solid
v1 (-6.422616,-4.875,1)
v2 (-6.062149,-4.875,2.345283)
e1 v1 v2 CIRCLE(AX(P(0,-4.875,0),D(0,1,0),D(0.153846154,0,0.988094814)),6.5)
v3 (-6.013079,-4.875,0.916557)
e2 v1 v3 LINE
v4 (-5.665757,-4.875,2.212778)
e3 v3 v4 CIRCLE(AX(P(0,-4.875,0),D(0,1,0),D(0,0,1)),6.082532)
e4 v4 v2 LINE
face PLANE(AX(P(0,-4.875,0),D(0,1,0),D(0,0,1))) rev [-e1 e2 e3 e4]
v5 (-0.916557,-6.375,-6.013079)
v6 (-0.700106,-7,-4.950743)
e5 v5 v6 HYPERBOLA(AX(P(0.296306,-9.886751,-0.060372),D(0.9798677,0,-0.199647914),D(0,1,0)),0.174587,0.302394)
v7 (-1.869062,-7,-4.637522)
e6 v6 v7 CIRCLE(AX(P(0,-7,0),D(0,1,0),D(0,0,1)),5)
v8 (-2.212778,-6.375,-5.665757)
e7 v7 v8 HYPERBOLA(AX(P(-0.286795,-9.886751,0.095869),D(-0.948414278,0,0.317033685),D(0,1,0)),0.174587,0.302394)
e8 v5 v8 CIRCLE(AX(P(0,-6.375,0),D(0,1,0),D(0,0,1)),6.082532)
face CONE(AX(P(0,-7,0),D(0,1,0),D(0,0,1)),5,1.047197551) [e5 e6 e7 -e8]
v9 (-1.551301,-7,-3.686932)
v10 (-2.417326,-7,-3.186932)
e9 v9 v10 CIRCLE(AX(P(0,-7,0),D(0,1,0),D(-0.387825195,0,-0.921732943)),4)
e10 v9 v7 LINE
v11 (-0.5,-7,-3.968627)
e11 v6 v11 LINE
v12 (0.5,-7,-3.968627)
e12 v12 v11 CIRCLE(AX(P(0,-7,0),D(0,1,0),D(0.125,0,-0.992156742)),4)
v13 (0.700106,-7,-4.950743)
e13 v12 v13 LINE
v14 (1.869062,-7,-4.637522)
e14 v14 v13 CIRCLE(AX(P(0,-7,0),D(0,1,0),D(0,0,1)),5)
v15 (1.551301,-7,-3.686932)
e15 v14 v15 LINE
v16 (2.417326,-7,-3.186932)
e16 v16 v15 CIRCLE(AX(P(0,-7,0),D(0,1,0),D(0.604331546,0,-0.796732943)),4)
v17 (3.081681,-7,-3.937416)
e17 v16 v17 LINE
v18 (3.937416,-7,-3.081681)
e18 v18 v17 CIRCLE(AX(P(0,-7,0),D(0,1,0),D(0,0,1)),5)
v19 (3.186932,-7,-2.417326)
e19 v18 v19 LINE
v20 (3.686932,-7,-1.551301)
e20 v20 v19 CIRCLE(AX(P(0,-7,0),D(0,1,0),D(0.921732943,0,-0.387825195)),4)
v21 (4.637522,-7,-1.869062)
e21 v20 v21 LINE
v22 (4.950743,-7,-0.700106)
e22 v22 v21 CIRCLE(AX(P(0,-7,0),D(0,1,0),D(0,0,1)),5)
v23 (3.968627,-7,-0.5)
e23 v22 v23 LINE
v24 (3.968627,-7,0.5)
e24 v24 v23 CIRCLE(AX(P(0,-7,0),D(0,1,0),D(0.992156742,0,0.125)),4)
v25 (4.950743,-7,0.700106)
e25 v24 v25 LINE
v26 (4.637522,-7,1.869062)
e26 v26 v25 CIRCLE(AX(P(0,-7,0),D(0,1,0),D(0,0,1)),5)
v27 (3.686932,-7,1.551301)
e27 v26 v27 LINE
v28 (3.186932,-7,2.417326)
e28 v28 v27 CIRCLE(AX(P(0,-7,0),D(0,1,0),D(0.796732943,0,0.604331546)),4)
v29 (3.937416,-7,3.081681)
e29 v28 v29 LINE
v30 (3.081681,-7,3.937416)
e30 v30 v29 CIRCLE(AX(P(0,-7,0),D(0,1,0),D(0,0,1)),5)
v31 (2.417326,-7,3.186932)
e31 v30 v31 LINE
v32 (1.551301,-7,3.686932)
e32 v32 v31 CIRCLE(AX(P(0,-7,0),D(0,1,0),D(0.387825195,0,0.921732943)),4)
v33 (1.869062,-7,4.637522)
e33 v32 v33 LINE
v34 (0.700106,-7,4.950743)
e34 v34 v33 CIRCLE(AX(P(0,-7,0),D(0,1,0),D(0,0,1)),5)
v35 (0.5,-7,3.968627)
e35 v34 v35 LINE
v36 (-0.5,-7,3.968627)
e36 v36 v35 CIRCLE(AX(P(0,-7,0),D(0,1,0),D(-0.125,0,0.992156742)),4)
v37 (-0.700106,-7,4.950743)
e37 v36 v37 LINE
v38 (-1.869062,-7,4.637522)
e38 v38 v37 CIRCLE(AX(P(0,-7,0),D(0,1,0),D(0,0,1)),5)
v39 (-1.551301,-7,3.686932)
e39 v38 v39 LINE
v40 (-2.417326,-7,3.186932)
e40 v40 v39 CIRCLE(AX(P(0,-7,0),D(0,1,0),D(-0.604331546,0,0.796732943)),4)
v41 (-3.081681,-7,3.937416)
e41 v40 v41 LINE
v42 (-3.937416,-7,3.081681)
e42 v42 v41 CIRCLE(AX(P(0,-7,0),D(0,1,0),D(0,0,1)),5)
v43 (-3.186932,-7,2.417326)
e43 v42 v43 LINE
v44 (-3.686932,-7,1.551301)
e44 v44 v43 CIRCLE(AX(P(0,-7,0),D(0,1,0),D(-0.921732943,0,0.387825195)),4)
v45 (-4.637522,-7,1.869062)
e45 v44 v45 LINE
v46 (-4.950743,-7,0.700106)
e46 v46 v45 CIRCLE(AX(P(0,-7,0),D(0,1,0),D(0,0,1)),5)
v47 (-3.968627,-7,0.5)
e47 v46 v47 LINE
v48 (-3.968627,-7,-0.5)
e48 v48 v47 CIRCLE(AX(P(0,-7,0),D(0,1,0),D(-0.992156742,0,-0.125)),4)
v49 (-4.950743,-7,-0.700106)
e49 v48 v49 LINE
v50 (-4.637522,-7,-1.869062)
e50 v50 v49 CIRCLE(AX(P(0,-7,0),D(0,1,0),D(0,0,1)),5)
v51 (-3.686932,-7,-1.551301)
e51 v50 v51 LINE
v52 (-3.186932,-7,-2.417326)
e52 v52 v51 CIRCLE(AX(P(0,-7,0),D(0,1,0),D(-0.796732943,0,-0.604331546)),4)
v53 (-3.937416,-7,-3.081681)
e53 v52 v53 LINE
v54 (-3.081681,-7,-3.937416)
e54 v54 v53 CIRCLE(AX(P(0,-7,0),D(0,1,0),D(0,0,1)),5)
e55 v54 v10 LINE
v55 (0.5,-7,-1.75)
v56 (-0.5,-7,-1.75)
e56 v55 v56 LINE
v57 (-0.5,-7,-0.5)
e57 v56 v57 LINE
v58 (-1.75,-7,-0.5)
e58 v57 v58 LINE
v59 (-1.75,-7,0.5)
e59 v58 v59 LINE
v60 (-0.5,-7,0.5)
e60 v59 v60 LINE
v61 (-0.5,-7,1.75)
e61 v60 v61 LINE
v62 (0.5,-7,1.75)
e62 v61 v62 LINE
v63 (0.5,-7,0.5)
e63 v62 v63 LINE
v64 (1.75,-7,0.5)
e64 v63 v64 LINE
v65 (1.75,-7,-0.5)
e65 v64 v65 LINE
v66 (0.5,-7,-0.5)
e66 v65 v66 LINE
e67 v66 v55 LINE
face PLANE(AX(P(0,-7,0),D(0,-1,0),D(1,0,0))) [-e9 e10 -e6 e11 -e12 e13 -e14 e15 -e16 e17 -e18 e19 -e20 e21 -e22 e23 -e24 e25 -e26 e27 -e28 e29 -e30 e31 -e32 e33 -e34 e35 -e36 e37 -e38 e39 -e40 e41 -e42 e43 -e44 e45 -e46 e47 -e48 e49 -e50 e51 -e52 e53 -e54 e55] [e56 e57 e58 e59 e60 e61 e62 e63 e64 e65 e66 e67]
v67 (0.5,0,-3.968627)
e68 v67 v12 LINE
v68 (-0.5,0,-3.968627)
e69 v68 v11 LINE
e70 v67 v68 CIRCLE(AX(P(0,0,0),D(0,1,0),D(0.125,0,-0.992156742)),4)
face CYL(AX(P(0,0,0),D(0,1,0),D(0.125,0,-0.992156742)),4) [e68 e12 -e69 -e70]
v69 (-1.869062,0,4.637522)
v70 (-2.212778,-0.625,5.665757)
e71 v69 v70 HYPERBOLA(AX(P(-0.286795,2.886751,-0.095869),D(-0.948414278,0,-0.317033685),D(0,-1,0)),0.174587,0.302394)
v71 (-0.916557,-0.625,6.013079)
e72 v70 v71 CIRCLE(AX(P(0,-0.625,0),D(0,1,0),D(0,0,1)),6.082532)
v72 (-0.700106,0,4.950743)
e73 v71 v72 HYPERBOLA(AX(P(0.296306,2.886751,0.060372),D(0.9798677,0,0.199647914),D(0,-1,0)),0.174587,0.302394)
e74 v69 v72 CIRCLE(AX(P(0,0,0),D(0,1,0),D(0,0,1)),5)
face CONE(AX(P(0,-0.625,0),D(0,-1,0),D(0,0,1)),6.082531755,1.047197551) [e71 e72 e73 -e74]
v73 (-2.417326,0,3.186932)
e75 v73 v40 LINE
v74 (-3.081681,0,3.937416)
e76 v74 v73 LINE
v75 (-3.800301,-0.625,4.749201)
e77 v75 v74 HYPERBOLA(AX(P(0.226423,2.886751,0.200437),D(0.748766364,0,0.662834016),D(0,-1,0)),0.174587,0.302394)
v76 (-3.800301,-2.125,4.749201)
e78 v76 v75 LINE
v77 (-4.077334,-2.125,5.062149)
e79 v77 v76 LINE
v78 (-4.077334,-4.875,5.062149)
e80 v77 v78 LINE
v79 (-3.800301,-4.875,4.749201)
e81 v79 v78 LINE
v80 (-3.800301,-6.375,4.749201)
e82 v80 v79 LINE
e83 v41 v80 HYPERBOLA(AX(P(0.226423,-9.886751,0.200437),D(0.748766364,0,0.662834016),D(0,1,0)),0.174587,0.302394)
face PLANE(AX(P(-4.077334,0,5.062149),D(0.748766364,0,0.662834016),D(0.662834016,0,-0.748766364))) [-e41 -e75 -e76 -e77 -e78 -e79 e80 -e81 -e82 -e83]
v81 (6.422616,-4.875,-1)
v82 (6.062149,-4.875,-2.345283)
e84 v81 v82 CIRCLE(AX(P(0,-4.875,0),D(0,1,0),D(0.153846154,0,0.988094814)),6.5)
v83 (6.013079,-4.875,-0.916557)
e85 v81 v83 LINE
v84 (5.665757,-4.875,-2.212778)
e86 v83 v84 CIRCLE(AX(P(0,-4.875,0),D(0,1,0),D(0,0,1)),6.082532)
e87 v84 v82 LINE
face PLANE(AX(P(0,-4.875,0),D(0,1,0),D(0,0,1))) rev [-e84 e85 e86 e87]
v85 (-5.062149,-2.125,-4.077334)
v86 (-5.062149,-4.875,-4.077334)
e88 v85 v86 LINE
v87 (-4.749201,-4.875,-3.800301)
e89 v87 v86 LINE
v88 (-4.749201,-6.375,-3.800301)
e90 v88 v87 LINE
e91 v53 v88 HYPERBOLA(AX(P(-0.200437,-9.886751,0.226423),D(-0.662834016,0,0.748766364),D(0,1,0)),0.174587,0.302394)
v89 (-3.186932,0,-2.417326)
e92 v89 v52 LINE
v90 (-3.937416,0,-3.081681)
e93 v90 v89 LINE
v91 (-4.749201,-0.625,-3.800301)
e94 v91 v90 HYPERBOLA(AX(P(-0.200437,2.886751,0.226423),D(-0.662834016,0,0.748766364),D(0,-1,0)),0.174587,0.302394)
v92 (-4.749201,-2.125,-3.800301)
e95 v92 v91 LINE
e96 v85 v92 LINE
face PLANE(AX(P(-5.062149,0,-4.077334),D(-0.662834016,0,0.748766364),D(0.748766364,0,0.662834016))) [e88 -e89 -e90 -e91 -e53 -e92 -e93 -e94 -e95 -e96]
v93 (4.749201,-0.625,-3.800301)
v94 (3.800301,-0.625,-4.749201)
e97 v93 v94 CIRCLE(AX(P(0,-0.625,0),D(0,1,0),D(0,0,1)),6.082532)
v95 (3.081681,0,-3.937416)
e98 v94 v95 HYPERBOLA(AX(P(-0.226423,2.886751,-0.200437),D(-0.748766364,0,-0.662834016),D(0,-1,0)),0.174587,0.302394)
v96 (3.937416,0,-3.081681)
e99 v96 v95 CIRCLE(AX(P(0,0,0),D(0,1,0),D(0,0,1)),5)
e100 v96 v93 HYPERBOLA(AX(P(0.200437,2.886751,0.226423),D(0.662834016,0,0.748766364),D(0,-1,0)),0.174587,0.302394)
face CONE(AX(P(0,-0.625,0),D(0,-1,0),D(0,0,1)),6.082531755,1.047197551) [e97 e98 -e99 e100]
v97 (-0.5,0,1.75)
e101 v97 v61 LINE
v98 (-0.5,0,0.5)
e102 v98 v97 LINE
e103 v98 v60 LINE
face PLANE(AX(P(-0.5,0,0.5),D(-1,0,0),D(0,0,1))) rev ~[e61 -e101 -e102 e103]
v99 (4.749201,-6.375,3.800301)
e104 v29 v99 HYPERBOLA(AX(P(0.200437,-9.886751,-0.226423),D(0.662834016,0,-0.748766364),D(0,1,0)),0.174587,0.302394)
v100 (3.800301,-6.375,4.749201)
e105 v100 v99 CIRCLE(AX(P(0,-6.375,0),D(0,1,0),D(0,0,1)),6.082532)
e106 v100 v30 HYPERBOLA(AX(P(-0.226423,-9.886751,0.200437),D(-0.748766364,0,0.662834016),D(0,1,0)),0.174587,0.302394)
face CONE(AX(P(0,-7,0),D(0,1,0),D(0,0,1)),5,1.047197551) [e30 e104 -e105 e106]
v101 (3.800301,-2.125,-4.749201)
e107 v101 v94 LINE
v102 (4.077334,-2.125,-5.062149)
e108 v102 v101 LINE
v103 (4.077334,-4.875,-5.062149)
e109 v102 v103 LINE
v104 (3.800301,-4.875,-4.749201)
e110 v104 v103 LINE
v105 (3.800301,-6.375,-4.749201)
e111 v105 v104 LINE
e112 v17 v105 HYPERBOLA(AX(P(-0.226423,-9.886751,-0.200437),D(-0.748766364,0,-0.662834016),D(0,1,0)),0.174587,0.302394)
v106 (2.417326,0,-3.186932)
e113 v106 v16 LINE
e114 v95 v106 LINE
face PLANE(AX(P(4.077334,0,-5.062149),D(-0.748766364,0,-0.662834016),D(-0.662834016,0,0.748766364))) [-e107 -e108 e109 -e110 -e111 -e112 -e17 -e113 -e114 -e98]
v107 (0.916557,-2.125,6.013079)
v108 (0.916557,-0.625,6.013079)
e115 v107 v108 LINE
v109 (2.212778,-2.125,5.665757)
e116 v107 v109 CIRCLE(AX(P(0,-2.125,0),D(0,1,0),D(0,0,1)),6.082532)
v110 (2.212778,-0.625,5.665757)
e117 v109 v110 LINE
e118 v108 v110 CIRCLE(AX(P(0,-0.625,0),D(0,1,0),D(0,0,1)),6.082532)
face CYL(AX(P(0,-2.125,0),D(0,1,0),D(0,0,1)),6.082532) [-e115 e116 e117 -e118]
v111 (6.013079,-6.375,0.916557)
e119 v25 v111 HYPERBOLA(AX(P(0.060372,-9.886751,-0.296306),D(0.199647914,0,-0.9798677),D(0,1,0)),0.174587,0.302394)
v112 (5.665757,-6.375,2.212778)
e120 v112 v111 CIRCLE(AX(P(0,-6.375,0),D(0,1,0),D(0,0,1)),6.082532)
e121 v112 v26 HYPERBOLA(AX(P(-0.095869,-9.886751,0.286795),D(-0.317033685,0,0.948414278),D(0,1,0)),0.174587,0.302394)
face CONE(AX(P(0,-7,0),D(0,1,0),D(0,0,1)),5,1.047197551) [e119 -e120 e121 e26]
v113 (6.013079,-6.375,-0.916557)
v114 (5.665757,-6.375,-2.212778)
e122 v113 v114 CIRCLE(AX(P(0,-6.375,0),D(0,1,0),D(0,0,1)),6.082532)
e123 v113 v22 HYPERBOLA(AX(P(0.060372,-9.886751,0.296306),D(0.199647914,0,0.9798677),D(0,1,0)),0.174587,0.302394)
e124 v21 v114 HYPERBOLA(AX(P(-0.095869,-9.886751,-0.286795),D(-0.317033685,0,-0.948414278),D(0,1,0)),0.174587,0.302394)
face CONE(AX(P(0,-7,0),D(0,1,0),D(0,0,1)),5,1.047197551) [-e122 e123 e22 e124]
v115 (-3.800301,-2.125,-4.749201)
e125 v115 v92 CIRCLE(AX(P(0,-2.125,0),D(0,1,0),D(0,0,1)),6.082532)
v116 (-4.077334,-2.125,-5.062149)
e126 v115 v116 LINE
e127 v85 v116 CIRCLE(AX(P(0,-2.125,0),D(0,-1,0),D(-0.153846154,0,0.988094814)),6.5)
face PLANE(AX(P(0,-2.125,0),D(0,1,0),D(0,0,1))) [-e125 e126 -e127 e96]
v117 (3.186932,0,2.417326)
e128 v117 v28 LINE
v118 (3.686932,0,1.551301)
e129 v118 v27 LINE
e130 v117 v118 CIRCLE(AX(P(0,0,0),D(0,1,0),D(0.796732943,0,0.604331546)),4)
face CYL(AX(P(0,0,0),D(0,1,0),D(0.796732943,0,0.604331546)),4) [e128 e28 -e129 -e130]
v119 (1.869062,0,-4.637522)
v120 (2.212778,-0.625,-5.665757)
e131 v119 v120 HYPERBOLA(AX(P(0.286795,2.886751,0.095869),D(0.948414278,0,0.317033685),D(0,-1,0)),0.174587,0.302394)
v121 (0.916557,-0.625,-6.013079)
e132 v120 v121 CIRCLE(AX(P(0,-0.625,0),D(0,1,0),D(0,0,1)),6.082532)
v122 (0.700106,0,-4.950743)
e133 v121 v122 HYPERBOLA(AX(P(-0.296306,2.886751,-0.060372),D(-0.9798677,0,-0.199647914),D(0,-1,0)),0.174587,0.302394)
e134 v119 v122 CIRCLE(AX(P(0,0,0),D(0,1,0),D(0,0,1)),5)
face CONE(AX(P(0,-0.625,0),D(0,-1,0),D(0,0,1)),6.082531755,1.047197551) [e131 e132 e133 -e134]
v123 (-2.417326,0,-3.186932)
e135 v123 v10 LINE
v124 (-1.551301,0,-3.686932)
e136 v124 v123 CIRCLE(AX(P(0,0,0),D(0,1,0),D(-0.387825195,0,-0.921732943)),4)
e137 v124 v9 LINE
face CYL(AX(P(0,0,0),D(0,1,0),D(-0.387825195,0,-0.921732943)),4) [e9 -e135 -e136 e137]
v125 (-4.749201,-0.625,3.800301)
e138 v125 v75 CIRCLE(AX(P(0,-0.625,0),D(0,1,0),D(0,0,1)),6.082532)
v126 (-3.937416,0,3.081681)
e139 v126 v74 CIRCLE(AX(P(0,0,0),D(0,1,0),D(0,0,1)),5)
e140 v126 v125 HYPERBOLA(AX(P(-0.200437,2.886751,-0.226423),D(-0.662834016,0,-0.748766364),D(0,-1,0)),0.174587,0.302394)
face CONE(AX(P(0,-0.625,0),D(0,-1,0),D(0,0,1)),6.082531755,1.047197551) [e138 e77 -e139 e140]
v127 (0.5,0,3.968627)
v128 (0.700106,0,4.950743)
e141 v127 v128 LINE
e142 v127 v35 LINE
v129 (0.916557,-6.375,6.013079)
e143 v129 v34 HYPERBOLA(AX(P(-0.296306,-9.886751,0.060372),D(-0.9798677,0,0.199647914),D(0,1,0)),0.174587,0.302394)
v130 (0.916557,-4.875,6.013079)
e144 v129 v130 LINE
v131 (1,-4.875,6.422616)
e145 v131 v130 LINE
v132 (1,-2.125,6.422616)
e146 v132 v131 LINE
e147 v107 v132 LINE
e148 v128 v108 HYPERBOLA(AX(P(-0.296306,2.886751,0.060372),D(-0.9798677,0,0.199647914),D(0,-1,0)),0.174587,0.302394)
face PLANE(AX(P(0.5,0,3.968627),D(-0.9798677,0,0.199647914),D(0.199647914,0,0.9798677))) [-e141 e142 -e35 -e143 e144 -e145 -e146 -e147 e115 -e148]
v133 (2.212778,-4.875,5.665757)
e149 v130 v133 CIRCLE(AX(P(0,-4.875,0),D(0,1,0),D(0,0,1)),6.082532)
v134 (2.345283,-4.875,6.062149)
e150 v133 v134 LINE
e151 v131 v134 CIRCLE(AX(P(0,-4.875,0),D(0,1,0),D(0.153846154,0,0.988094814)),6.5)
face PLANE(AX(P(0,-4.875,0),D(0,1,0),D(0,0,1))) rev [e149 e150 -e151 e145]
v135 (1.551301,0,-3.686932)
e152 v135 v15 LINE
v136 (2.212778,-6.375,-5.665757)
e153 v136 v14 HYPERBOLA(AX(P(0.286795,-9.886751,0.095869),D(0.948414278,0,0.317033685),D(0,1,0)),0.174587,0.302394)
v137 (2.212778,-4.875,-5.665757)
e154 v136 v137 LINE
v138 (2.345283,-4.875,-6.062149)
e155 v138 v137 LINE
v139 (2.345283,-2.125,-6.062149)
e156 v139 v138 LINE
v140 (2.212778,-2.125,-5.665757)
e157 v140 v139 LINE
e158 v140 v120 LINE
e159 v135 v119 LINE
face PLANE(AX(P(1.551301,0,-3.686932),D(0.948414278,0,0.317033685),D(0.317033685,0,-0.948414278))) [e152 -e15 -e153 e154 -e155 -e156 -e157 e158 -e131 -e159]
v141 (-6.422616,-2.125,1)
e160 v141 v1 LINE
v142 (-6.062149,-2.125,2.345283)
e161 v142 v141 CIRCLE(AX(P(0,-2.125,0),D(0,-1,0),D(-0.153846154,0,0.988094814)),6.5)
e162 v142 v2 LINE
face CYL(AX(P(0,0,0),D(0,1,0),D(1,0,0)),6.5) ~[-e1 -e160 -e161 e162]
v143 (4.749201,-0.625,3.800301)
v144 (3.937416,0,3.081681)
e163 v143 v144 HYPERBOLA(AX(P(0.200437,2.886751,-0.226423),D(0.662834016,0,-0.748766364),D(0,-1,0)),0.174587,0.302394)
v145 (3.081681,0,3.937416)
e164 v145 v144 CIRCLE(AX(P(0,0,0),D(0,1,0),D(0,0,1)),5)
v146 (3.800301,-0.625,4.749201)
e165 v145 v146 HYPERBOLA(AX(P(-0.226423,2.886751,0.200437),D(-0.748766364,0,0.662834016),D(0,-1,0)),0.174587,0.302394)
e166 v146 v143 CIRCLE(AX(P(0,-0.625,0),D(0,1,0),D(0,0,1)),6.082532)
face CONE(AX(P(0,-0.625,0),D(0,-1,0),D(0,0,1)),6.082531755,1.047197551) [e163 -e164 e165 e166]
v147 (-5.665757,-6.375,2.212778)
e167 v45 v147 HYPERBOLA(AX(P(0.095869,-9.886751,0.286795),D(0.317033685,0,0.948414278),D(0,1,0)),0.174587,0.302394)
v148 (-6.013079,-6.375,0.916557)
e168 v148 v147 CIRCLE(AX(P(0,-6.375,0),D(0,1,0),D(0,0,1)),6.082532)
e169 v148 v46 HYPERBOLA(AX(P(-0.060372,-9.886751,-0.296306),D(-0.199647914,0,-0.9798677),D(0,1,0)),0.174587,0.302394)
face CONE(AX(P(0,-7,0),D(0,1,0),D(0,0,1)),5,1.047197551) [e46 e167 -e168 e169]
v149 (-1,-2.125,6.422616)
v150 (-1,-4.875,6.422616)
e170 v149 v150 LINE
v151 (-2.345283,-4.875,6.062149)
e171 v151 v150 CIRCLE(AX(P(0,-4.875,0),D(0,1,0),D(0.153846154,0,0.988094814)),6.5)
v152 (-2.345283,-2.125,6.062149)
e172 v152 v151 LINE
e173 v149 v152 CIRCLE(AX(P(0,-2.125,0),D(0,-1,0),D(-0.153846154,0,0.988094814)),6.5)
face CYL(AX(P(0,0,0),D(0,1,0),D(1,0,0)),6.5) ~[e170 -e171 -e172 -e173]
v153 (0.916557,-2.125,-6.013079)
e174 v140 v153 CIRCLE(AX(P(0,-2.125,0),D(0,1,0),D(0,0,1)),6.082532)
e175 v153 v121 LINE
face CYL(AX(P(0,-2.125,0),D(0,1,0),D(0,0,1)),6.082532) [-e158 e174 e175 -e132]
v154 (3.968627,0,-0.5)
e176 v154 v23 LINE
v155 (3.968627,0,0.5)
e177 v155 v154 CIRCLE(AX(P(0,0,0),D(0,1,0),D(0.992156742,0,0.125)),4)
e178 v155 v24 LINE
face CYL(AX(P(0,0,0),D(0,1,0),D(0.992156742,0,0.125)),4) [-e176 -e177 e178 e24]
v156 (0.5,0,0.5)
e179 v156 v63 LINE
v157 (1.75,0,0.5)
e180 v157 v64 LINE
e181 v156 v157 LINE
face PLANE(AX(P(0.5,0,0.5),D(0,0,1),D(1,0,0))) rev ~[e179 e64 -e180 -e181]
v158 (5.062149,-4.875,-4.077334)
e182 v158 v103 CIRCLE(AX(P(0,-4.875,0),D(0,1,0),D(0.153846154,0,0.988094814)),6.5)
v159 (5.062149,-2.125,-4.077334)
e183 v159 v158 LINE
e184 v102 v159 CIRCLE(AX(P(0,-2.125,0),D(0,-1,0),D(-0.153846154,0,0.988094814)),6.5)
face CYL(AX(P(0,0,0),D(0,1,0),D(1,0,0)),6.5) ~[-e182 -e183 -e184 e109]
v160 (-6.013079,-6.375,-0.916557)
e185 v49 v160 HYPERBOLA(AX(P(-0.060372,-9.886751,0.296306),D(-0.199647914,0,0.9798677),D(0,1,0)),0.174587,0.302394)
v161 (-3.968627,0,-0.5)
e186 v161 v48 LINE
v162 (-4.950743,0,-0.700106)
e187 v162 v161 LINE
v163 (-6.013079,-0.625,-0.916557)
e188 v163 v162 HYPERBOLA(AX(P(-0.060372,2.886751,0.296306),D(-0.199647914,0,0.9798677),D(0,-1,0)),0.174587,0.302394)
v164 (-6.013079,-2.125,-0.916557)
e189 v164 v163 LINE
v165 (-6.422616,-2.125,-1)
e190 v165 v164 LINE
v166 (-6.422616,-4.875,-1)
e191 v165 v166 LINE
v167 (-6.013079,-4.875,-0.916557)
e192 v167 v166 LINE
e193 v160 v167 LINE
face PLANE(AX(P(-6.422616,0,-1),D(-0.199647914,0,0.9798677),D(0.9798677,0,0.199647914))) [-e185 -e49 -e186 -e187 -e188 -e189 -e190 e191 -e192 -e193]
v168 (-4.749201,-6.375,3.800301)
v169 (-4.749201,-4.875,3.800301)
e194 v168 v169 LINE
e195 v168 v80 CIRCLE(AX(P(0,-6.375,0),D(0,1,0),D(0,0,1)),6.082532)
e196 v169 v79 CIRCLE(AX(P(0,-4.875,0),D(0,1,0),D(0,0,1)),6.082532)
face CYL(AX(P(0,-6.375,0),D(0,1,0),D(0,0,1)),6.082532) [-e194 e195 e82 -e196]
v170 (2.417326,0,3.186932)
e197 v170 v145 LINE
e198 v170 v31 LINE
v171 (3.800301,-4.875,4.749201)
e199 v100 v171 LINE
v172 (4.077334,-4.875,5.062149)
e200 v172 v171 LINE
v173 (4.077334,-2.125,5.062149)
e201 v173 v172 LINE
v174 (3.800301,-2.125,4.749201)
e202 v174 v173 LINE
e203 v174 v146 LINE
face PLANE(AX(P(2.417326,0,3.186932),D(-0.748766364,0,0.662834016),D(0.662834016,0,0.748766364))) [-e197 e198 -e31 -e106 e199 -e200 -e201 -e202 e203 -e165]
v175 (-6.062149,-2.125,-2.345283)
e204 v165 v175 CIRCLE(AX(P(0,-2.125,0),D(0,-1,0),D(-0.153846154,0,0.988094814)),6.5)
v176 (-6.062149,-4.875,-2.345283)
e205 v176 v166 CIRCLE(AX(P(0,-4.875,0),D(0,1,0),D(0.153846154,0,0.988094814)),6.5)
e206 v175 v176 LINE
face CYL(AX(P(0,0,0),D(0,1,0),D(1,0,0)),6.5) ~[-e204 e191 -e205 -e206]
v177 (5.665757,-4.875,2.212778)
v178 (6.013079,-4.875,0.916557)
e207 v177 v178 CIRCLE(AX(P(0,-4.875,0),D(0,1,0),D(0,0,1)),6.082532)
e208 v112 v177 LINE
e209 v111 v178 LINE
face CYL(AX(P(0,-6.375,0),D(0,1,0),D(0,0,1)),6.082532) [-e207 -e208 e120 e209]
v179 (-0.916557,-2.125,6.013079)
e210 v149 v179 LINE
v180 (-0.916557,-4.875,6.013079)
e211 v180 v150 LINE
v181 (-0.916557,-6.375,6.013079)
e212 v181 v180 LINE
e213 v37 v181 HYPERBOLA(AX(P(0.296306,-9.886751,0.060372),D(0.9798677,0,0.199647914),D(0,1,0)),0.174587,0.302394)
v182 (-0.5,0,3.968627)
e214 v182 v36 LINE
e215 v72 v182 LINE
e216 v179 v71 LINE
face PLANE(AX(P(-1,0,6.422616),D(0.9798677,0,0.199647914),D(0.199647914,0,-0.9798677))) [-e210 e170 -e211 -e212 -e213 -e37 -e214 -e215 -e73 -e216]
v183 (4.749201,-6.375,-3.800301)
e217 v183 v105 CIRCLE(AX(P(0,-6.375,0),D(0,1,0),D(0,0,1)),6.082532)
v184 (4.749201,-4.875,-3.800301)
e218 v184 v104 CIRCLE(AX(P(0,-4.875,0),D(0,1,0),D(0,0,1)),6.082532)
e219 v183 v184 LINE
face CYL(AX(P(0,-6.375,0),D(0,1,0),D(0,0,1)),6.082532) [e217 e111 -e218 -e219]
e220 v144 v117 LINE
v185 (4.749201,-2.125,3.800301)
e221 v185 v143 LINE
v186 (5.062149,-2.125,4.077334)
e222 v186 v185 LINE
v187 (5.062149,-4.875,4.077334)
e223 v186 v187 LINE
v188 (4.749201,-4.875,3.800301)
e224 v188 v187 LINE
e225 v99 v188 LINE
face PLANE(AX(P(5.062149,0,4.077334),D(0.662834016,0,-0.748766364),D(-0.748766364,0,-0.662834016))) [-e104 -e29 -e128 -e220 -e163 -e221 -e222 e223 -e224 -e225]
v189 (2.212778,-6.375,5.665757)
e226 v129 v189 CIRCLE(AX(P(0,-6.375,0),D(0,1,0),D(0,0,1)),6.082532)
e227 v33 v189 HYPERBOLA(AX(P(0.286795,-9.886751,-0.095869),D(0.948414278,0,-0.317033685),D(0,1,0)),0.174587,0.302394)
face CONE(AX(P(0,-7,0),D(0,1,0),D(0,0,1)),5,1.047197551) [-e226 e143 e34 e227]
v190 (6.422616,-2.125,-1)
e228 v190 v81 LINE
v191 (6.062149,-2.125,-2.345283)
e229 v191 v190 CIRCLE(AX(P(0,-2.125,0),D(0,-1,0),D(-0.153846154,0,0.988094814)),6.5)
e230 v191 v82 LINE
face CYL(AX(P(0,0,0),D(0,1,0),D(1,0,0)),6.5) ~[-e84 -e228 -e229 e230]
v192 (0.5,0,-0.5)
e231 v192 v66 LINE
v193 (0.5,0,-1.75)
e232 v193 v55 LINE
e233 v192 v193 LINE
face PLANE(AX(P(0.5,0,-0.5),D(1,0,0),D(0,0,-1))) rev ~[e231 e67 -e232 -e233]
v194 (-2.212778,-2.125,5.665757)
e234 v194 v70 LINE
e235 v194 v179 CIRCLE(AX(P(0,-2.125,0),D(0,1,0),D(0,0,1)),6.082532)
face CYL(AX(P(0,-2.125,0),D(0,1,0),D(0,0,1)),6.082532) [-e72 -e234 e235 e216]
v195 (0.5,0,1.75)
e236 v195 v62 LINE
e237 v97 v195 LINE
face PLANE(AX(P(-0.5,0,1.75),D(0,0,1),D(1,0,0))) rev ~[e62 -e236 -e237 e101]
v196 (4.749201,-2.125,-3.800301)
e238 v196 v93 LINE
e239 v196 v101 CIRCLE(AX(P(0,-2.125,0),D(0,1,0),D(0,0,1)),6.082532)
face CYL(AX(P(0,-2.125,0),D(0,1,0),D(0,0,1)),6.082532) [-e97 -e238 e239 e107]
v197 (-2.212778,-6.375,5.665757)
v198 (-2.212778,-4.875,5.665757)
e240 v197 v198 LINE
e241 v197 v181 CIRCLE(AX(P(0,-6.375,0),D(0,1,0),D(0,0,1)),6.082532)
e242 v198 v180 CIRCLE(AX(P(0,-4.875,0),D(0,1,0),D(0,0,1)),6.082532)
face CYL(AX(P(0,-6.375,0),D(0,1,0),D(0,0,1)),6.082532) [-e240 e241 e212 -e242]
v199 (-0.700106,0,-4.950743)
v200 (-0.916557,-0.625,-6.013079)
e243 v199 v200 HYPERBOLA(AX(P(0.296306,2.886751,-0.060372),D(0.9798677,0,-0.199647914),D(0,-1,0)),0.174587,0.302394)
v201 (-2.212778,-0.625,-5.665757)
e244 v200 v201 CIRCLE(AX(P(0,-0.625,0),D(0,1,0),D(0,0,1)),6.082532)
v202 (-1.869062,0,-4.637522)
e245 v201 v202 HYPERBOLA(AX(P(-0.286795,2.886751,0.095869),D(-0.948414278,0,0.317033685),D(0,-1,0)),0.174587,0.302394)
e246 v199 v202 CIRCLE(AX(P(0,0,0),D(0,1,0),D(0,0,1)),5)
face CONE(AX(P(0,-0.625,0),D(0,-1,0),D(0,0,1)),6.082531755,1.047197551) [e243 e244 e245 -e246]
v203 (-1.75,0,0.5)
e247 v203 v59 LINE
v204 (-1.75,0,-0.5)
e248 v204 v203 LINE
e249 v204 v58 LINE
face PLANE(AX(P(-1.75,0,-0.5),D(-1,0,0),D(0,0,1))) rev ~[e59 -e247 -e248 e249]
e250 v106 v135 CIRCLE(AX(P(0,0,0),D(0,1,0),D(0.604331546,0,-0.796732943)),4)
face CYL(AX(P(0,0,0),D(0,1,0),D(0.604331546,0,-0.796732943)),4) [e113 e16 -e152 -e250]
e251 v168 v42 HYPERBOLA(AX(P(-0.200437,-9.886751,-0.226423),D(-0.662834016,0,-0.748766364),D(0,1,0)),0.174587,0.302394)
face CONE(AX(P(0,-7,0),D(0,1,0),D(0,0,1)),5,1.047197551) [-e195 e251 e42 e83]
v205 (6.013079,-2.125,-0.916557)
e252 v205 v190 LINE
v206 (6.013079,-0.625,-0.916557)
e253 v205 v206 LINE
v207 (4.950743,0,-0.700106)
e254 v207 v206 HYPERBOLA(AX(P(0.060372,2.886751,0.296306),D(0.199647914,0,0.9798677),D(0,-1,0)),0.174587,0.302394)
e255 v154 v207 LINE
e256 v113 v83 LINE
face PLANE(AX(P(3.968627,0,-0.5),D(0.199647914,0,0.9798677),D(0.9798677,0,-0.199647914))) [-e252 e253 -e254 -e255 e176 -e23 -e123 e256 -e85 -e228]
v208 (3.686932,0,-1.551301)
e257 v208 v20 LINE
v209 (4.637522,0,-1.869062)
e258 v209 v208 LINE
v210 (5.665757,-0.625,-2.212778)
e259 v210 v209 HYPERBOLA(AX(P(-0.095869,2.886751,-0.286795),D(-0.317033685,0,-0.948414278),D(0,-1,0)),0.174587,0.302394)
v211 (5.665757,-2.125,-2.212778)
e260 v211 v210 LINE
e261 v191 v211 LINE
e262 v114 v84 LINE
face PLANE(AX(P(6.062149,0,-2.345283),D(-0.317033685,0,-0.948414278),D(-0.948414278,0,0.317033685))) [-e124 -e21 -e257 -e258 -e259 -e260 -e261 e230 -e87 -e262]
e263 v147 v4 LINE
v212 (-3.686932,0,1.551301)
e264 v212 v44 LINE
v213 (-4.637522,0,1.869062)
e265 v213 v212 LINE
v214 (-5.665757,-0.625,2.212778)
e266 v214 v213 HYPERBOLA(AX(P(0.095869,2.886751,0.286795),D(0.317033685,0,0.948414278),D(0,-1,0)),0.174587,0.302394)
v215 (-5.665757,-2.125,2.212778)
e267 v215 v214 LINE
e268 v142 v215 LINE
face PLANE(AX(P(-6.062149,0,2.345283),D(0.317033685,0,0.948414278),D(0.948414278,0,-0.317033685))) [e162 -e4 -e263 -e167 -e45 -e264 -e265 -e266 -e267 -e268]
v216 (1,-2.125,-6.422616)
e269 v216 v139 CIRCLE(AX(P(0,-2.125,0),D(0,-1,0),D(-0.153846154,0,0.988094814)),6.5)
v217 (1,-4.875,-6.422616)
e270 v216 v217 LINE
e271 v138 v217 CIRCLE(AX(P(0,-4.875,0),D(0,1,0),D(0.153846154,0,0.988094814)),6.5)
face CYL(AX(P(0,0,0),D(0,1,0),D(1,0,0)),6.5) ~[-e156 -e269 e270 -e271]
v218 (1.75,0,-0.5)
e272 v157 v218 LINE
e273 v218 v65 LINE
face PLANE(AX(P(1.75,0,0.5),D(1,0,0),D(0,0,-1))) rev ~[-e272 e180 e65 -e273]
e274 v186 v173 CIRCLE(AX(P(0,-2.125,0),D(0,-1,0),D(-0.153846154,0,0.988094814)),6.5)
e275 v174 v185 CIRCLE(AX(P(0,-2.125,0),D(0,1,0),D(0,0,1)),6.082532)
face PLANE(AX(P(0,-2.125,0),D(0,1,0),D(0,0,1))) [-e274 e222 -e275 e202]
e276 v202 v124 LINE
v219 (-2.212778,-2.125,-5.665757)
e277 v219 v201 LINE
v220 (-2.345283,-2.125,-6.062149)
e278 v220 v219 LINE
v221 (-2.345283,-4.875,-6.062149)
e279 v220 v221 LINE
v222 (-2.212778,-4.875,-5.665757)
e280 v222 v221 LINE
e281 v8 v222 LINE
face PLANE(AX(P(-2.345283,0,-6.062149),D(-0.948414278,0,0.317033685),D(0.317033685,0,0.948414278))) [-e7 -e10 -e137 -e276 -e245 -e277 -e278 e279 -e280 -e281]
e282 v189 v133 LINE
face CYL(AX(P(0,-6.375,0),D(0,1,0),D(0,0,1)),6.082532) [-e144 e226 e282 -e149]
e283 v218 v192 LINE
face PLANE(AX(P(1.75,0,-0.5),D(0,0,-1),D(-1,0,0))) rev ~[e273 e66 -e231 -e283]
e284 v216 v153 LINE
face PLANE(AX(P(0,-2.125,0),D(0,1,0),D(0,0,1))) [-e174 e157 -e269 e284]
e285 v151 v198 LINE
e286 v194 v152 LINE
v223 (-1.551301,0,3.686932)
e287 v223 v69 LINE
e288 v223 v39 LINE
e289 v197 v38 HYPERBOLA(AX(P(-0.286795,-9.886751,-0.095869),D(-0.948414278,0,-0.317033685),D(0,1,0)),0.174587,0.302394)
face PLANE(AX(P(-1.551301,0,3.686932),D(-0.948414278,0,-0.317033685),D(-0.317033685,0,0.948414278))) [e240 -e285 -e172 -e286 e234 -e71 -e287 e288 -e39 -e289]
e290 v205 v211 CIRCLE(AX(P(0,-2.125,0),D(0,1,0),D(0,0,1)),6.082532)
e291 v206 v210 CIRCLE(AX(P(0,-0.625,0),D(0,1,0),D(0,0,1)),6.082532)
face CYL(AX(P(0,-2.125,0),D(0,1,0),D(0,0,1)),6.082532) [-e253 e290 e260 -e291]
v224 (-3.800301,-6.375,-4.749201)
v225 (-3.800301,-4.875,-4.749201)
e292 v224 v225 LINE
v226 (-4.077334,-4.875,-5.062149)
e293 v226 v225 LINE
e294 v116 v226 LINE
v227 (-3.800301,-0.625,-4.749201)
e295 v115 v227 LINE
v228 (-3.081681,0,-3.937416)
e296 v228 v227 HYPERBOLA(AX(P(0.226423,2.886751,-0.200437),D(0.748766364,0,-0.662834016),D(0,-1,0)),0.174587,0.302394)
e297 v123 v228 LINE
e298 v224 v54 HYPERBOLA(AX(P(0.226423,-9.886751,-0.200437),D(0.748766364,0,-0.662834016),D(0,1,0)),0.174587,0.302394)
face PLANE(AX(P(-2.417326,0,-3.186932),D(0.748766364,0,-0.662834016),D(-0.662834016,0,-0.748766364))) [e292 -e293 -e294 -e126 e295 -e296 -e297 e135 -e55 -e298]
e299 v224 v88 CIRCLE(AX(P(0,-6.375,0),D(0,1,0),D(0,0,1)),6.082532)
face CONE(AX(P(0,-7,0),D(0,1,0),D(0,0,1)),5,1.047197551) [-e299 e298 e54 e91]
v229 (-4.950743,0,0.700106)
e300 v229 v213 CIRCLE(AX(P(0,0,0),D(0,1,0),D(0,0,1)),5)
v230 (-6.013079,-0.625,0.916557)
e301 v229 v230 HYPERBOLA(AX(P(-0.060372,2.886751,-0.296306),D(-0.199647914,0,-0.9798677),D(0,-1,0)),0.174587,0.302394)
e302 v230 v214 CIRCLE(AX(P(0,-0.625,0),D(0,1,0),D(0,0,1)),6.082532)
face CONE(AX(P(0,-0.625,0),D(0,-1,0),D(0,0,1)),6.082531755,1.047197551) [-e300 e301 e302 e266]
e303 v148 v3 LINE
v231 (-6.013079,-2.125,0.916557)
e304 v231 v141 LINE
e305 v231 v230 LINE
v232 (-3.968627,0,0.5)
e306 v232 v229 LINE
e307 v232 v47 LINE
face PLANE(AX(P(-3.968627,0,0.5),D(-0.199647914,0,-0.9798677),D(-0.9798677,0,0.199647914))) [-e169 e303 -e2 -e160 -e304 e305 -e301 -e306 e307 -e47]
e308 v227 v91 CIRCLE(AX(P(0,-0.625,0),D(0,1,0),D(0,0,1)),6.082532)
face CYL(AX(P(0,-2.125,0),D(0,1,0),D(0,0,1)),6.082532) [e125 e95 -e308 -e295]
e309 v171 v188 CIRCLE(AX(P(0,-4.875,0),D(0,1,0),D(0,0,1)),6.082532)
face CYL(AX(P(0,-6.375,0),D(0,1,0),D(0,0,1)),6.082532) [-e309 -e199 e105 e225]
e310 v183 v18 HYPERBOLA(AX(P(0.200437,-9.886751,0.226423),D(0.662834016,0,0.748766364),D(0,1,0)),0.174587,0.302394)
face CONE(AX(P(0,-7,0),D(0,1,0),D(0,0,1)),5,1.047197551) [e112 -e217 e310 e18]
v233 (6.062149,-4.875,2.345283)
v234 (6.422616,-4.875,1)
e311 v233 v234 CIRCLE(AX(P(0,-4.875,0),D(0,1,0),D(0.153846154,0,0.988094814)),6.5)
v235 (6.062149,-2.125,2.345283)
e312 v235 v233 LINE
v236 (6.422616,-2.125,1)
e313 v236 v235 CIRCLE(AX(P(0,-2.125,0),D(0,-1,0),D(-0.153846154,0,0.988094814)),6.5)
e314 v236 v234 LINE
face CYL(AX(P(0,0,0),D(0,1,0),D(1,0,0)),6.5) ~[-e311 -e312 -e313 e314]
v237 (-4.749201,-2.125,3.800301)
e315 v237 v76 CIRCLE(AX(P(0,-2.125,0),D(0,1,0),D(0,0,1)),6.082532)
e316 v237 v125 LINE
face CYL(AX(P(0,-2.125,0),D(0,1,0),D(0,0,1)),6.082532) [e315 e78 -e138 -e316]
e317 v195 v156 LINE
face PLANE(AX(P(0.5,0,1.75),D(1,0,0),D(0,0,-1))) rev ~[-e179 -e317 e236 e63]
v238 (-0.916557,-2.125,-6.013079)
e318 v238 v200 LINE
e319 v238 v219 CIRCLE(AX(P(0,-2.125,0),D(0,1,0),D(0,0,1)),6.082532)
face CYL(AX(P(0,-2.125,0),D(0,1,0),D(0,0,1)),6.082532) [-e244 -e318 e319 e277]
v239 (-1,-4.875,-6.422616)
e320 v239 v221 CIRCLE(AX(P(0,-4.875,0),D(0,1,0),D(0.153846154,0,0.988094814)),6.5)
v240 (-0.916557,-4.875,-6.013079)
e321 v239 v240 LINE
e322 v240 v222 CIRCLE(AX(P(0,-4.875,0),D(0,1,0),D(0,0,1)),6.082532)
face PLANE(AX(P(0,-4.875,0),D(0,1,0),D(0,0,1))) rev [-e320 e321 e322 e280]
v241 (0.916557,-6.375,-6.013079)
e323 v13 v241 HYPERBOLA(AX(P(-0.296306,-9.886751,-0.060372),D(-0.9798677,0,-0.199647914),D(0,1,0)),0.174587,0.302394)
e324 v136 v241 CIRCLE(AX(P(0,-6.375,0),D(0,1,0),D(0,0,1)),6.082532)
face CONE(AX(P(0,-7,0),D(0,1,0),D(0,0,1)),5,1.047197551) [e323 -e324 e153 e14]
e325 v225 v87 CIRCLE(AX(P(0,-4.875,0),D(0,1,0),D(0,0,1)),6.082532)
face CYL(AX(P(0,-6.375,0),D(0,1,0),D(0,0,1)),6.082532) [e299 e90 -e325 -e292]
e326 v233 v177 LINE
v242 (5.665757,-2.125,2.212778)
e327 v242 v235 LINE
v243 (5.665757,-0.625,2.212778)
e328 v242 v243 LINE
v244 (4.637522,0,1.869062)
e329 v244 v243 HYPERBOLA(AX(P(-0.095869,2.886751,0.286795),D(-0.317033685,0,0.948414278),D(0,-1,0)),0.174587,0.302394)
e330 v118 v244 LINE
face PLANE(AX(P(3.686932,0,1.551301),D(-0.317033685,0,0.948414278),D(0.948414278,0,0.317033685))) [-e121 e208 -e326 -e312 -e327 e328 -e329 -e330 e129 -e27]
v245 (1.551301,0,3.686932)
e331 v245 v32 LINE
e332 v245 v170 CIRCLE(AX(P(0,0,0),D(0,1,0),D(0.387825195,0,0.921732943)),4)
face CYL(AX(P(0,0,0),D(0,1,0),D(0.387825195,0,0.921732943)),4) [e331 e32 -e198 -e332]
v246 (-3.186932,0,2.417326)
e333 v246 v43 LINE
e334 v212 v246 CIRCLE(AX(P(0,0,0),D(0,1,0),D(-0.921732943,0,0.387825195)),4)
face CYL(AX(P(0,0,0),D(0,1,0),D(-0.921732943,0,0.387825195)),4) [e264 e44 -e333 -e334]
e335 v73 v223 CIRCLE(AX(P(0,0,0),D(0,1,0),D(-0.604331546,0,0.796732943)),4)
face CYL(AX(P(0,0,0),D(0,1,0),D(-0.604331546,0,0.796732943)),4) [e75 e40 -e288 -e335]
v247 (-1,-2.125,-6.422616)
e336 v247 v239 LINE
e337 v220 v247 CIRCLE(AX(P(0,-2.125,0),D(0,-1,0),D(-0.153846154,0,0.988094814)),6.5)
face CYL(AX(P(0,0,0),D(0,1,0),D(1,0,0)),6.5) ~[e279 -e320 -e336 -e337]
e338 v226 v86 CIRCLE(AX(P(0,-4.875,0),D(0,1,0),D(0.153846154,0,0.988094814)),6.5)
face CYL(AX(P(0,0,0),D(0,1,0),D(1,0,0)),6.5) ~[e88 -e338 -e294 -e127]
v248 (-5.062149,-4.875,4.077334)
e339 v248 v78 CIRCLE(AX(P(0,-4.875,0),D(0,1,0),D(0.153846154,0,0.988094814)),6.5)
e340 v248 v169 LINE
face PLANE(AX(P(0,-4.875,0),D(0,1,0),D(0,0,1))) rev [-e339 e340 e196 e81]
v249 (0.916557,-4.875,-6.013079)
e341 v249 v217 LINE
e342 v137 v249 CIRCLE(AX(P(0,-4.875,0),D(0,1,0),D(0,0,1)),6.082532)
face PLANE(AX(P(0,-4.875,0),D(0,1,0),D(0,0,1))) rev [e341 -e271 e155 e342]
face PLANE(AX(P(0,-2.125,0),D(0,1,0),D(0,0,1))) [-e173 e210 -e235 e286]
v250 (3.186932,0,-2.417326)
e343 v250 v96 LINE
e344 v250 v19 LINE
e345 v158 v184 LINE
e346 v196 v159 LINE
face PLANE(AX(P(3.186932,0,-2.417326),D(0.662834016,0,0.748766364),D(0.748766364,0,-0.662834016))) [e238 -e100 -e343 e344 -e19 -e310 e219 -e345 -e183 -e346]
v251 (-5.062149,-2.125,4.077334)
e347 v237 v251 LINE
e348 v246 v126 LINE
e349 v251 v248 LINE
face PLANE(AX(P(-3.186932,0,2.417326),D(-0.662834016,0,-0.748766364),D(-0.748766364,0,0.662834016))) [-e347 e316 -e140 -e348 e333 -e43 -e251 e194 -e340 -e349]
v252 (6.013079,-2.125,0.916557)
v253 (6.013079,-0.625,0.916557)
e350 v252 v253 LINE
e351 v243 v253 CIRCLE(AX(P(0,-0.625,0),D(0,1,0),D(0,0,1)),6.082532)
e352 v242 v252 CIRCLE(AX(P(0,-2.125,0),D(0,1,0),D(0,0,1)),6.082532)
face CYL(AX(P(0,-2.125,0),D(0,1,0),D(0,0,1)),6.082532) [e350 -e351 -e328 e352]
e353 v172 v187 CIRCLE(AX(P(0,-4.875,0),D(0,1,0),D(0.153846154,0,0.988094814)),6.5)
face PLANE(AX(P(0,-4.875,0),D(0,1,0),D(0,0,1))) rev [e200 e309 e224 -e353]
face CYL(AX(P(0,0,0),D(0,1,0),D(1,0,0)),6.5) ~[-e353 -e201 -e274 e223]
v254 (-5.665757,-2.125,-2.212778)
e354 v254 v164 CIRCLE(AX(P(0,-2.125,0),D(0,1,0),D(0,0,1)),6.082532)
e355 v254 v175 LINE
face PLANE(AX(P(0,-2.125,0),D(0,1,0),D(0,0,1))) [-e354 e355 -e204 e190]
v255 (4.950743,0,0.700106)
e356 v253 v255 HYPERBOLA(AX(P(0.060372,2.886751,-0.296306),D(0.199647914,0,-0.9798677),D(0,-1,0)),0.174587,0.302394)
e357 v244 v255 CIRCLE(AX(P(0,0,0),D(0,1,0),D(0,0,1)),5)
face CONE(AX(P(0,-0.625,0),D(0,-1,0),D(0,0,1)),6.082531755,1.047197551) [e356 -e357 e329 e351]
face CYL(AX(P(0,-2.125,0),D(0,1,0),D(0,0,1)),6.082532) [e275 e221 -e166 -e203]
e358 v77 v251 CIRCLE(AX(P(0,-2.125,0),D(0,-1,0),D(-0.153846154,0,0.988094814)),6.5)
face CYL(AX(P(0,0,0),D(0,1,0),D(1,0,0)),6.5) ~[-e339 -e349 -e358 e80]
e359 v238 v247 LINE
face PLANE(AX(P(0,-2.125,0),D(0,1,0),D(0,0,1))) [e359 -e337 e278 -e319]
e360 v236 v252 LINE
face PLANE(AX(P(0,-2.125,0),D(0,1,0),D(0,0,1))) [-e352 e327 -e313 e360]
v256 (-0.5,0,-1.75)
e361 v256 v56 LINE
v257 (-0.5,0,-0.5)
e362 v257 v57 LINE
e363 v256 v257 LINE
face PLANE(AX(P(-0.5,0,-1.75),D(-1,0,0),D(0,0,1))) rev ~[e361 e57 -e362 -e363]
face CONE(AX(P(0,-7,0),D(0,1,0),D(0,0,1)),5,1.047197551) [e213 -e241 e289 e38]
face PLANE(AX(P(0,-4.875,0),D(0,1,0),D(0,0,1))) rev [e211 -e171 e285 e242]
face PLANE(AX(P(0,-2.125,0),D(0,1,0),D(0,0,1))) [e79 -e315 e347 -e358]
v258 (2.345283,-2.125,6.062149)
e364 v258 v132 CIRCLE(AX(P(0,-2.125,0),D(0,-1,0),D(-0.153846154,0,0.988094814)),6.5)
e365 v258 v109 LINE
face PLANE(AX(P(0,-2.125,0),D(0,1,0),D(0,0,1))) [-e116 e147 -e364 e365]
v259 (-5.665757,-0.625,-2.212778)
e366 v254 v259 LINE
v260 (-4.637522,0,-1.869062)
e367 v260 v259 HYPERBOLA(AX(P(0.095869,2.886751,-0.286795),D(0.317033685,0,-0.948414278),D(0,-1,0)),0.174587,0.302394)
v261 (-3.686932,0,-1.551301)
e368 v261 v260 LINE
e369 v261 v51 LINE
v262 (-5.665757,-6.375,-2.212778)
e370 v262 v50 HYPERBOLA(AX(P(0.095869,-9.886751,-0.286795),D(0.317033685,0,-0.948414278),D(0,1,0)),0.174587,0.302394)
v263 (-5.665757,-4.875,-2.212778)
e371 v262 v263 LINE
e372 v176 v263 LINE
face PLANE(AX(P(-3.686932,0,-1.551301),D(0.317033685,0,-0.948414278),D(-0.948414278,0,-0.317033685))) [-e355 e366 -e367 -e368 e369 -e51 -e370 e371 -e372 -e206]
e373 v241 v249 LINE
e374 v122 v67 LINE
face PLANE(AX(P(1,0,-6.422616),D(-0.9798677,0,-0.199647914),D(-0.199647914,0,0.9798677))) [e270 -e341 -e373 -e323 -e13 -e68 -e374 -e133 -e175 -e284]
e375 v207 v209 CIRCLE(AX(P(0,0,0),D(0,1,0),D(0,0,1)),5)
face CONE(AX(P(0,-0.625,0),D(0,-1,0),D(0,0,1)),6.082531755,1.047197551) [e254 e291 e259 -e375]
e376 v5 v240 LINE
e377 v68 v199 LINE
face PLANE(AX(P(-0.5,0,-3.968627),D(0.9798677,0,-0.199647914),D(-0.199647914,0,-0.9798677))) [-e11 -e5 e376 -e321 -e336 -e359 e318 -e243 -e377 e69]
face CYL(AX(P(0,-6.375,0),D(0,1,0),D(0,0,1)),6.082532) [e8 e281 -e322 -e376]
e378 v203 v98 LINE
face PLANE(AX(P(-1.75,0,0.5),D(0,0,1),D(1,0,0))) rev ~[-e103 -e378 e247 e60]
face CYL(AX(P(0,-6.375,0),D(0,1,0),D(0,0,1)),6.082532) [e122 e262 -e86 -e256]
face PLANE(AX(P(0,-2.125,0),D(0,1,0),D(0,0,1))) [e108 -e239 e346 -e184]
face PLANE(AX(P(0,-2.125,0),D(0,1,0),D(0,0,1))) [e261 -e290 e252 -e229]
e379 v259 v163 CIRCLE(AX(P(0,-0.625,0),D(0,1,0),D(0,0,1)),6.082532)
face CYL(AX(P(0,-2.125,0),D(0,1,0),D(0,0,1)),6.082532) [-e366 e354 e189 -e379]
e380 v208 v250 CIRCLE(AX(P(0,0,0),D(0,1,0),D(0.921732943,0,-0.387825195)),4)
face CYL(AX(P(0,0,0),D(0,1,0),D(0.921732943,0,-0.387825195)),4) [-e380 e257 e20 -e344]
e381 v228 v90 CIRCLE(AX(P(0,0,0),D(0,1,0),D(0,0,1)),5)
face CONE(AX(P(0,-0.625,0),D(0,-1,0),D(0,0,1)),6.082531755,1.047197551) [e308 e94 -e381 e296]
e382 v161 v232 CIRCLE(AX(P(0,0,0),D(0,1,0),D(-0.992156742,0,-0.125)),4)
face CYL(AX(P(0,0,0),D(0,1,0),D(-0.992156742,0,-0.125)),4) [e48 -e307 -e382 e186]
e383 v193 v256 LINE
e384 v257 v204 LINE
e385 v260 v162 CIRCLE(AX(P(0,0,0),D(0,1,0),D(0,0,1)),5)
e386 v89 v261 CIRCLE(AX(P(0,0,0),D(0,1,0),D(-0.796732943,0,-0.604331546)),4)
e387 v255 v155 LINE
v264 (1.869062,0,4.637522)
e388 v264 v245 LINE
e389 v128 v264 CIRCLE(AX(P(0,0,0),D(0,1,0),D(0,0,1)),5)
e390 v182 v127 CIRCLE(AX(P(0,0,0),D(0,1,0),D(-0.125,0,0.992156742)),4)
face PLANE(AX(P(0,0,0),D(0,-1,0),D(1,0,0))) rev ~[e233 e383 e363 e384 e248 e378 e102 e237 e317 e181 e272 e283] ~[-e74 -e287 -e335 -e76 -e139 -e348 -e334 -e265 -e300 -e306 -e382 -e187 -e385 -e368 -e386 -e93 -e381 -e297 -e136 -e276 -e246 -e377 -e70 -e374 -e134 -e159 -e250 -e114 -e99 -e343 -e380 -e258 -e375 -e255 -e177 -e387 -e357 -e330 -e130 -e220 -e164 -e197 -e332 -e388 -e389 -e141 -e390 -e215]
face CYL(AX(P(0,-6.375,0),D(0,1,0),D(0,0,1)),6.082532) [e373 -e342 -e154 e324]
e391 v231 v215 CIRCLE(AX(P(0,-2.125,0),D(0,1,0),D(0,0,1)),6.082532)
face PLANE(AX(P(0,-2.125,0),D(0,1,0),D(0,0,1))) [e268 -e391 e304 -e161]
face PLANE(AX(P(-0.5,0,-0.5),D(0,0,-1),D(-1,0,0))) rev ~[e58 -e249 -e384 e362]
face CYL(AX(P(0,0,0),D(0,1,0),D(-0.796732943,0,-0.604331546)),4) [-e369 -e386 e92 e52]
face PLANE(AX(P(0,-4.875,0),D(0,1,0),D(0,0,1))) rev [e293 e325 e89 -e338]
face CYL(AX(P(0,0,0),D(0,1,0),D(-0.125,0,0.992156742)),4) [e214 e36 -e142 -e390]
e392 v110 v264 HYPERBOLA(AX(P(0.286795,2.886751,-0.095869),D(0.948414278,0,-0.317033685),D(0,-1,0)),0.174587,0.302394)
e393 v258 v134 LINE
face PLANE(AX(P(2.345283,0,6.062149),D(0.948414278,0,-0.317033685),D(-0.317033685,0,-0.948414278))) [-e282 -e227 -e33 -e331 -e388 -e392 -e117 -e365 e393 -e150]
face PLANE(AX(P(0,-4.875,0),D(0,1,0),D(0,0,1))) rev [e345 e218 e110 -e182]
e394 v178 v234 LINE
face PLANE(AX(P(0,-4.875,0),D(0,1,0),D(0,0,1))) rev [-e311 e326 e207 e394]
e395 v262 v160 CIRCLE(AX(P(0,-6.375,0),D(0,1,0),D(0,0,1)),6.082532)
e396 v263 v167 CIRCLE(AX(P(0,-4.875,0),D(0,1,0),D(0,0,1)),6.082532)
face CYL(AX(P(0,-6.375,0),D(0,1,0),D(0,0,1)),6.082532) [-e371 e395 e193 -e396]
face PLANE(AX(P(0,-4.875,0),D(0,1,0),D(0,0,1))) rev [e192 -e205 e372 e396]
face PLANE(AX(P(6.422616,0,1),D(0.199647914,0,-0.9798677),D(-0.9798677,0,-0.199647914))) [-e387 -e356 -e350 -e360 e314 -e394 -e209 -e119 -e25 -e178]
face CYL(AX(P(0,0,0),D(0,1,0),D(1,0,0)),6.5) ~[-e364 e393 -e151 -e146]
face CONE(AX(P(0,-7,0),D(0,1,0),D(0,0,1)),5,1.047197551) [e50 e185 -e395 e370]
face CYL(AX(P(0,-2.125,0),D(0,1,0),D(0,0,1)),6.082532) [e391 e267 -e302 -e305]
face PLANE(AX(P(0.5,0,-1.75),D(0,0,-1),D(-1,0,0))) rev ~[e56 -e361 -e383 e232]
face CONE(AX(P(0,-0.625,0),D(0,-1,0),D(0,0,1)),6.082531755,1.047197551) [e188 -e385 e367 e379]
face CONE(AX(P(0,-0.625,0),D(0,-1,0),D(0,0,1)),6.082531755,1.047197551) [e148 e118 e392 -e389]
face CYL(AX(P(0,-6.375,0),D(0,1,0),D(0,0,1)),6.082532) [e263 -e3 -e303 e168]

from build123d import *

# Parameters (mm, degrees)
F0_R            = 6.5
F1_DEPTH        = 7
F5_DEPTH        = 7.001
F5_COPIES_COUNT = 12


# Not quite as in the source:
# - a pattern or mirror of a feature is missing from the dataset's text; its kind, count and spacing are read off the source's solid


with BuildPart() as f1:
    # F0 (on Front) → F1 (new body)
    with BuildSketch(Plane.XZ):
        Circle(F0_R)
        Polygon((-1.75, 0.5), (-0.5, 0.5), (-0.5, 1.75), (0.5, 1.75), (0.5, 0.5), (1.75, 0.5), (1.75, -0.5), (0.5, -0.5), (0.5, -1.75), (-0.5, -1.75), (-0.5, -0.5), (-1.75, -0.5), align=None, mode=Mode.SUBTRACT)
    extrude(amount=F1_DEPTH)

    # F2 (on Right) → F3 (revolve, cut)
    with BuildSketch(Plane.YZ):
        Polygon((-7, 8), (-7, 5), (-6.375, 6.0825317547), (-4.875, 6.0825317547), (-4.875, 6.5), (-2.125, 6.5), (-2.125, 6.0825317547), (-0.625, 6.0825317547), (0, 5), (0, 8), align=None)
    revolve(axis=Axis((0, 2.603987056, 0), (0, 1, 0)), mode=Mode.SUBTRACT)

    # F4 (on Front) → F5 (cut, through all)
    with BuildSketch(Plane.XZ):
        with BuildLine():
            Line((0.5, 3.9686269666), (1, 6.4226162893))
            ThreePointArc((1, 6.4226162893), (0, 6.5), (-1, 6.4226162893))
            Line((-1, 6.4226162893), (-0.5, 3.9686269666))
            ThreePointArc((-0.5, 3.9686269666), (0, 4), (0.5, 3.9686269666))
        make_face()
    f5 = extrude(amount=F5_DEPTH, mode=Mode.SUBTRACT)

    # F5_copies: F5 ×12 about axis
    f5_copies_axis = Axis((0, 0, 0), (0, 1, 0))
    for i in range(1, F5_COPIES_COUNT):
        add(f5.rotate(f5_copies_axis, i * 360 / F5_COPIES_COUNT), mode=Mode.SUBTRACT)


solid = f1.part
